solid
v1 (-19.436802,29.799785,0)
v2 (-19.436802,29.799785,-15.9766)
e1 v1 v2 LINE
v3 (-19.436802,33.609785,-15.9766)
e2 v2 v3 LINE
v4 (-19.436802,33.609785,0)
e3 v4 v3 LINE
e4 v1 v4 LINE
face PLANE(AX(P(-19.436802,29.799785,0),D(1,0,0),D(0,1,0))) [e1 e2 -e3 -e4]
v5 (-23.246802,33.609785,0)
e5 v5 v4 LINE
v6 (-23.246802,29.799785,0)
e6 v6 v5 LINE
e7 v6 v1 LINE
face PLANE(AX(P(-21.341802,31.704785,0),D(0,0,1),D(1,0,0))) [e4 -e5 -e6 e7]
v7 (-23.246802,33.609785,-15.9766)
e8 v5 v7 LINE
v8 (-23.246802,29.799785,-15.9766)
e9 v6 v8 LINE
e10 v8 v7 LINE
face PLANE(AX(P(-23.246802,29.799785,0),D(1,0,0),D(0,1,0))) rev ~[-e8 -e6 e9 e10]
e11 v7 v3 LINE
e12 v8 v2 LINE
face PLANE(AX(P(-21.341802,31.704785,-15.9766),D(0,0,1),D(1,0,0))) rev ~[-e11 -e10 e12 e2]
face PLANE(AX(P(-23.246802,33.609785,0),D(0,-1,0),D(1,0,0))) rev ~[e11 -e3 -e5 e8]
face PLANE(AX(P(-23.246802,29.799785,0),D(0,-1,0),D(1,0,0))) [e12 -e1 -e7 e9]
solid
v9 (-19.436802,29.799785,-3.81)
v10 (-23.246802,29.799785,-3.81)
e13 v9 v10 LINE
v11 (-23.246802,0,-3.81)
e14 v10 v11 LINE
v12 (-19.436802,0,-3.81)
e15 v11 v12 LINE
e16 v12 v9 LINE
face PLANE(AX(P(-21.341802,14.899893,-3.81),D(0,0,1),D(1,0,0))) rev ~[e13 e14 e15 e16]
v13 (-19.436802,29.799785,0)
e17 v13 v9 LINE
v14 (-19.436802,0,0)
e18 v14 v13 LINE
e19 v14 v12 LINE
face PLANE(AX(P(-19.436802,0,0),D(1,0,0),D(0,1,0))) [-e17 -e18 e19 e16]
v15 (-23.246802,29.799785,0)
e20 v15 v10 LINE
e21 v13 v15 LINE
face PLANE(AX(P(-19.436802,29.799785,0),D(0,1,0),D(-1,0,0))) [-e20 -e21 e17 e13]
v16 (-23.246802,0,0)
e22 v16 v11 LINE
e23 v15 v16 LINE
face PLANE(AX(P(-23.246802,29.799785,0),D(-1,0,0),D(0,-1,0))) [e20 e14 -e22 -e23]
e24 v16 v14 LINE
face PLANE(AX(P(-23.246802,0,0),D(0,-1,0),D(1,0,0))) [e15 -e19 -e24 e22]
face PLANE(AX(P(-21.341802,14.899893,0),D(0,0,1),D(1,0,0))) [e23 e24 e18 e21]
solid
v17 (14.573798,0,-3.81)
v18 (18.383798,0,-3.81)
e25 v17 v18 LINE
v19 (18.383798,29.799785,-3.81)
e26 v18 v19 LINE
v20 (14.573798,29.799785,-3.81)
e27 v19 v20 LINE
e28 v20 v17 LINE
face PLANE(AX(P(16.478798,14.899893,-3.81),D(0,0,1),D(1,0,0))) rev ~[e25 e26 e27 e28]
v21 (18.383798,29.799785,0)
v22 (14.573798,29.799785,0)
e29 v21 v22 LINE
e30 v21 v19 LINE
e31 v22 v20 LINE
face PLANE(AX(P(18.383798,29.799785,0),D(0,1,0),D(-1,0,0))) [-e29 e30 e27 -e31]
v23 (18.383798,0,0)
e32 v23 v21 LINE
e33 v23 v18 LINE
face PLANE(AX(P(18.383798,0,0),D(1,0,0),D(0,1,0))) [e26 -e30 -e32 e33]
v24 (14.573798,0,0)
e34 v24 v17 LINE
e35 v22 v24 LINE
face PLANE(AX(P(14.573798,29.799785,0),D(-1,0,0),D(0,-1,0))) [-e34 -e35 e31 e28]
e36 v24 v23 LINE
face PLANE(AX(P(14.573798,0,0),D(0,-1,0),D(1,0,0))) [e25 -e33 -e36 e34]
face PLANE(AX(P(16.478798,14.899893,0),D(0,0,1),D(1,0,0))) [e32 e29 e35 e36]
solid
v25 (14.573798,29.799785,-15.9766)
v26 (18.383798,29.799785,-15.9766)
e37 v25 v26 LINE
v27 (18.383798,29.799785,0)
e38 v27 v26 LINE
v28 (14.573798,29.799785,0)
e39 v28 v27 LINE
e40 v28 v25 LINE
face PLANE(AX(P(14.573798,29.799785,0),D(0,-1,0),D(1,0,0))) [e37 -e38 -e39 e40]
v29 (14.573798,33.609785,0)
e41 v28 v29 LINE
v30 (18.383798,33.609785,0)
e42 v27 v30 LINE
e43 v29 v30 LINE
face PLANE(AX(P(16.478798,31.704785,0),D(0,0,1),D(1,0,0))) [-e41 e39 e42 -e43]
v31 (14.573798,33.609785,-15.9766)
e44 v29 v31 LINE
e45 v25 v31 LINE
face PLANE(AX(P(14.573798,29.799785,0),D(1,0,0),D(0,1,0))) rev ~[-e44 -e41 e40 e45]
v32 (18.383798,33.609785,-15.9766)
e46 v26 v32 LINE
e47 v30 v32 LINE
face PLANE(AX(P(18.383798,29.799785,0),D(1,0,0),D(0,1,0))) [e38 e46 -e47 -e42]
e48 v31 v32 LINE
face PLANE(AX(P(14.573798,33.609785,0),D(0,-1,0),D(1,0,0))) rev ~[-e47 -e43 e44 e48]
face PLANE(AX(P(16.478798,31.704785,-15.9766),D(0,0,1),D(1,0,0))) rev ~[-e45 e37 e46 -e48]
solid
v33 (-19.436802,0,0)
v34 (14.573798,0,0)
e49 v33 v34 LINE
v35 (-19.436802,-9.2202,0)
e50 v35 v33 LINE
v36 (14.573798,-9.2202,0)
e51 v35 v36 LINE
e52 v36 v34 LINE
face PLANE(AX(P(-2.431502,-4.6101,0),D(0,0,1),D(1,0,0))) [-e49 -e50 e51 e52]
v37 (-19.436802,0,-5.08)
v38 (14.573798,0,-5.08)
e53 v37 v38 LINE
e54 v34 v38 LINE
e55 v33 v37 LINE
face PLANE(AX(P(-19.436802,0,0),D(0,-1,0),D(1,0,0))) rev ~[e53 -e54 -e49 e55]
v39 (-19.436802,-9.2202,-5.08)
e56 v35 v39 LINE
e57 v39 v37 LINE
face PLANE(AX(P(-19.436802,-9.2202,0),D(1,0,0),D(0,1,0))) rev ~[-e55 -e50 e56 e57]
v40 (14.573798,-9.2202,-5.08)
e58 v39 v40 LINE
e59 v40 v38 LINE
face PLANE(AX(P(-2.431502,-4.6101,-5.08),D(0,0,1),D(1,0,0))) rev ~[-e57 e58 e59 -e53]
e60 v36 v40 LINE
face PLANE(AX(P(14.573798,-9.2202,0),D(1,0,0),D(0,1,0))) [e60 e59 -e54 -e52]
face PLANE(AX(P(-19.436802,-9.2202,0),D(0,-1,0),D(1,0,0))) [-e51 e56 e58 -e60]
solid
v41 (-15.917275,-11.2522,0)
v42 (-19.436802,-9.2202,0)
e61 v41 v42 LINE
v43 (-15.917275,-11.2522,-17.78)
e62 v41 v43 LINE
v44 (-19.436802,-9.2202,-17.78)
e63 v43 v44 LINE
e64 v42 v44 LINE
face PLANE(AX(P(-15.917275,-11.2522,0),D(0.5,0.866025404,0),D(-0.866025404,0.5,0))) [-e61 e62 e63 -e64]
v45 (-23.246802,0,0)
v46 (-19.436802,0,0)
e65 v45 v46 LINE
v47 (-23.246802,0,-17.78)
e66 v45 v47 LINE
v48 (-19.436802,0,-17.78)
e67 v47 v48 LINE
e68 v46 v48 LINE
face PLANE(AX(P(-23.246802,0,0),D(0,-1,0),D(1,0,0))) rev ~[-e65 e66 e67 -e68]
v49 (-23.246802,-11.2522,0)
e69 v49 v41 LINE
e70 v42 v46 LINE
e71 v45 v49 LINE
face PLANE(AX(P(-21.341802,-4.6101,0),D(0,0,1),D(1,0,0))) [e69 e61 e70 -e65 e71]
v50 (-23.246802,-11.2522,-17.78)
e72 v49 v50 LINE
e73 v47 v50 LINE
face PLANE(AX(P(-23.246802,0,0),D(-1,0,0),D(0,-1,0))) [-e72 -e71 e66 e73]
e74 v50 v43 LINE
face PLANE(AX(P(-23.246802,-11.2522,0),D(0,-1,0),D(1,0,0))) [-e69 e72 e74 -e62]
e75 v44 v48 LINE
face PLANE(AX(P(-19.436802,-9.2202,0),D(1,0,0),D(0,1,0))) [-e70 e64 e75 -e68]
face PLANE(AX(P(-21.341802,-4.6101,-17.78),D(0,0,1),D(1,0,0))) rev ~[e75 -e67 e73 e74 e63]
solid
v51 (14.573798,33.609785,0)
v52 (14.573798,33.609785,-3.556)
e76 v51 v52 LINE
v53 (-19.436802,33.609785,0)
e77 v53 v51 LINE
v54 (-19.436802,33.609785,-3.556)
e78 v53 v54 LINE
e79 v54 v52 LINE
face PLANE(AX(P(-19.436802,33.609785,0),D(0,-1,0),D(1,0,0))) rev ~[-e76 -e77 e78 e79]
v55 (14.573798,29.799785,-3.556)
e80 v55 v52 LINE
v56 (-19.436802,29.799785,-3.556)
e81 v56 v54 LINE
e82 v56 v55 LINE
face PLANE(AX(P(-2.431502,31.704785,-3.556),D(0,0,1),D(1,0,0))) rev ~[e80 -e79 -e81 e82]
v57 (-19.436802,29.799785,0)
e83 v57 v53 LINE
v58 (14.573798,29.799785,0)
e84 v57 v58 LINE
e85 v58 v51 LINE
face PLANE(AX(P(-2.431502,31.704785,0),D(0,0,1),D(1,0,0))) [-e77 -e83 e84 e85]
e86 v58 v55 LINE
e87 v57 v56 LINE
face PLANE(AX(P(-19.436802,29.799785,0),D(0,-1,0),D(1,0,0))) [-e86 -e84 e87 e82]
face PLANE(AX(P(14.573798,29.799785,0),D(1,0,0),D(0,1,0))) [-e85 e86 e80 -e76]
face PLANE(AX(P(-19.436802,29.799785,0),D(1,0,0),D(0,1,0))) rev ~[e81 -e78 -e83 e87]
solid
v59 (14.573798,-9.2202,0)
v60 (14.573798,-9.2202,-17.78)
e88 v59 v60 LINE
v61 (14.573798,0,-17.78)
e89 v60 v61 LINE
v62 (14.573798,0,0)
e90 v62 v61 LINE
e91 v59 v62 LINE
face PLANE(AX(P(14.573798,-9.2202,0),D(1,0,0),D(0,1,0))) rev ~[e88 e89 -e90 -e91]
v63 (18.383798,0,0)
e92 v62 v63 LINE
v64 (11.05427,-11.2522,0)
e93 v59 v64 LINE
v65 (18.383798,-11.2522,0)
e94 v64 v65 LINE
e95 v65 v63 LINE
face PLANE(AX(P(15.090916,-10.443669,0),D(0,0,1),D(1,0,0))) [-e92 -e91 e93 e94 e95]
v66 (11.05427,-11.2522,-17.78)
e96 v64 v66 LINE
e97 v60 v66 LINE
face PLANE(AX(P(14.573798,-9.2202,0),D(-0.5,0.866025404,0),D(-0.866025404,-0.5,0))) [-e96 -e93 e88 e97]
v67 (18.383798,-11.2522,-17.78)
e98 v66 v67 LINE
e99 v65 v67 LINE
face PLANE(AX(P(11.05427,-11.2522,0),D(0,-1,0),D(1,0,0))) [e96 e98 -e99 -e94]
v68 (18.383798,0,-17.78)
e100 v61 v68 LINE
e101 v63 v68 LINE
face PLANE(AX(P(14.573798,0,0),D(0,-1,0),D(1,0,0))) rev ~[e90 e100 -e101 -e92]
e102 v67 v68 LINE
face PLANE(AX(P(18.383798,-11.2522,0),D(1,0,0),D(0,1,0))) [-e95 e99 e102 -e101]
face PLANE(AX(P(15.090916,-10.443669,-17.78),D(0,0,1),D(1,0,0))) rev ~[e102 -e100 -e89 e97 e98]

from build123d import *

# Parameters (mm, degrees)
F0_W     = 3.81
F0_H     = 9.2202
F1_DEPTH = 17.78
F2_DEPTH = 3.81
F0_H_2   = 3.81
F3_DEPTH = 15.9766
F0_W_2   = 34.0106
F4_DEPTH = 5.08
F5_DEPTH = 3.556


# Not quite as in the source:
# - a feature names something its author has since deleted; it is built from what else it names


with BuildPart() as f1:
    # F0 (on Top) → F1 (new body)
    with BuildSketch(Plane.XY):
        with Locations((-21.3418023896, -4.6101)):
            Rectangle(F0_W, F0_H)
        Polygon((-15.9172751486, -11.2522), (-19.4368023896, -9.2202), (-23.2468023896, -9.2202), (-23.2468023896, -11.2522), align=None)
    extrude(amount=-F1_DEPTH)


with BuildPart() as f1b:
    # F0 (on Top) → F1, piece 2 (new body)
    with BuildSketch(Plane.XY):
        Polygon((18.3837976104, -9.2202), (14.5737976104, -9.2202), (11.0542703694, -11.2522), (18.3837976104, -11.2522), align=None)
        with Locations((16.4787976104, -4.6101)):
            Rectangle(F0_W, F0_H)
    extrude(amount=-F1_DEPTH)


with BuildPart() as f2:
    # F0 (on Top) → F2 (new body)
    with BuildSketch(Plane.XY):
        Polygon((-23.2468023896, 0), (-19.4368023896, 0), (-19.4368023896, 26.035), (-19.4368023896, 29.799785465), (-23.2468023896, 29.799785465), (-23.2468023896, 26.035), align=None)
    extrude(amount=-F2_DEPTH)


with BuildPart() as f2b:
    # F0 (on Top) → F2, piece 2 (new body)
    with BuildSketch(Plane.XY):
        Polygon((14.5737976104, 26.035), (14.5737976104, 0), (18.3837976104, 0), (18.3837976104, 26.035), (18.3837976104, 29.799785465), (14.5737976104, 29.799785465), align=None)
    extrude(amount=-F2_DEPTH)


with BuildPart() as f3:
    # F0 (on Top) → F3 (new body)
    with BuildSketch(Plane.XY):
        with Locations((-21.3418023896, 31.704785465)):
            Rectangle(F0_W, F0_H_2)
    extrude(amount=-F3_DEPTH)


with BuildPart() as f3b:
    # F0 (on Top) → F3, piece 2 (new body)
    with BuildSketch(Plane.XY):
        with Locations((16.4787976104, 31.704785465)):
            Rectangle(F0_W, F0_H_2)
    extrude(amount=-F3_DEPTH)


with BuildPart() as f4:
    # F0 (on Top) → F4 (new body)
    with BuildSketch(Plane.XY):
        with Locations((-2.4315023896, -4.6101)):
            Rectangle(F0_W_2, F0_H)
    extrude(amount=-F4_DEPTH)


with BuildPart() as f5:
    # F0 (on Top) → F5 (new body)
    with BuildSketch(Plane.XY):
        with Locations((-2.4315023896, 31.704785465)):
            Rectangle(F0_W_2, F0_H_2)
    extrude(amount=-F5_DEPTH)


solid = Compound([f1.part, f1b.part, f2.part, f2b.part, f3.part, f3b.part, f4.part, f5.part])
